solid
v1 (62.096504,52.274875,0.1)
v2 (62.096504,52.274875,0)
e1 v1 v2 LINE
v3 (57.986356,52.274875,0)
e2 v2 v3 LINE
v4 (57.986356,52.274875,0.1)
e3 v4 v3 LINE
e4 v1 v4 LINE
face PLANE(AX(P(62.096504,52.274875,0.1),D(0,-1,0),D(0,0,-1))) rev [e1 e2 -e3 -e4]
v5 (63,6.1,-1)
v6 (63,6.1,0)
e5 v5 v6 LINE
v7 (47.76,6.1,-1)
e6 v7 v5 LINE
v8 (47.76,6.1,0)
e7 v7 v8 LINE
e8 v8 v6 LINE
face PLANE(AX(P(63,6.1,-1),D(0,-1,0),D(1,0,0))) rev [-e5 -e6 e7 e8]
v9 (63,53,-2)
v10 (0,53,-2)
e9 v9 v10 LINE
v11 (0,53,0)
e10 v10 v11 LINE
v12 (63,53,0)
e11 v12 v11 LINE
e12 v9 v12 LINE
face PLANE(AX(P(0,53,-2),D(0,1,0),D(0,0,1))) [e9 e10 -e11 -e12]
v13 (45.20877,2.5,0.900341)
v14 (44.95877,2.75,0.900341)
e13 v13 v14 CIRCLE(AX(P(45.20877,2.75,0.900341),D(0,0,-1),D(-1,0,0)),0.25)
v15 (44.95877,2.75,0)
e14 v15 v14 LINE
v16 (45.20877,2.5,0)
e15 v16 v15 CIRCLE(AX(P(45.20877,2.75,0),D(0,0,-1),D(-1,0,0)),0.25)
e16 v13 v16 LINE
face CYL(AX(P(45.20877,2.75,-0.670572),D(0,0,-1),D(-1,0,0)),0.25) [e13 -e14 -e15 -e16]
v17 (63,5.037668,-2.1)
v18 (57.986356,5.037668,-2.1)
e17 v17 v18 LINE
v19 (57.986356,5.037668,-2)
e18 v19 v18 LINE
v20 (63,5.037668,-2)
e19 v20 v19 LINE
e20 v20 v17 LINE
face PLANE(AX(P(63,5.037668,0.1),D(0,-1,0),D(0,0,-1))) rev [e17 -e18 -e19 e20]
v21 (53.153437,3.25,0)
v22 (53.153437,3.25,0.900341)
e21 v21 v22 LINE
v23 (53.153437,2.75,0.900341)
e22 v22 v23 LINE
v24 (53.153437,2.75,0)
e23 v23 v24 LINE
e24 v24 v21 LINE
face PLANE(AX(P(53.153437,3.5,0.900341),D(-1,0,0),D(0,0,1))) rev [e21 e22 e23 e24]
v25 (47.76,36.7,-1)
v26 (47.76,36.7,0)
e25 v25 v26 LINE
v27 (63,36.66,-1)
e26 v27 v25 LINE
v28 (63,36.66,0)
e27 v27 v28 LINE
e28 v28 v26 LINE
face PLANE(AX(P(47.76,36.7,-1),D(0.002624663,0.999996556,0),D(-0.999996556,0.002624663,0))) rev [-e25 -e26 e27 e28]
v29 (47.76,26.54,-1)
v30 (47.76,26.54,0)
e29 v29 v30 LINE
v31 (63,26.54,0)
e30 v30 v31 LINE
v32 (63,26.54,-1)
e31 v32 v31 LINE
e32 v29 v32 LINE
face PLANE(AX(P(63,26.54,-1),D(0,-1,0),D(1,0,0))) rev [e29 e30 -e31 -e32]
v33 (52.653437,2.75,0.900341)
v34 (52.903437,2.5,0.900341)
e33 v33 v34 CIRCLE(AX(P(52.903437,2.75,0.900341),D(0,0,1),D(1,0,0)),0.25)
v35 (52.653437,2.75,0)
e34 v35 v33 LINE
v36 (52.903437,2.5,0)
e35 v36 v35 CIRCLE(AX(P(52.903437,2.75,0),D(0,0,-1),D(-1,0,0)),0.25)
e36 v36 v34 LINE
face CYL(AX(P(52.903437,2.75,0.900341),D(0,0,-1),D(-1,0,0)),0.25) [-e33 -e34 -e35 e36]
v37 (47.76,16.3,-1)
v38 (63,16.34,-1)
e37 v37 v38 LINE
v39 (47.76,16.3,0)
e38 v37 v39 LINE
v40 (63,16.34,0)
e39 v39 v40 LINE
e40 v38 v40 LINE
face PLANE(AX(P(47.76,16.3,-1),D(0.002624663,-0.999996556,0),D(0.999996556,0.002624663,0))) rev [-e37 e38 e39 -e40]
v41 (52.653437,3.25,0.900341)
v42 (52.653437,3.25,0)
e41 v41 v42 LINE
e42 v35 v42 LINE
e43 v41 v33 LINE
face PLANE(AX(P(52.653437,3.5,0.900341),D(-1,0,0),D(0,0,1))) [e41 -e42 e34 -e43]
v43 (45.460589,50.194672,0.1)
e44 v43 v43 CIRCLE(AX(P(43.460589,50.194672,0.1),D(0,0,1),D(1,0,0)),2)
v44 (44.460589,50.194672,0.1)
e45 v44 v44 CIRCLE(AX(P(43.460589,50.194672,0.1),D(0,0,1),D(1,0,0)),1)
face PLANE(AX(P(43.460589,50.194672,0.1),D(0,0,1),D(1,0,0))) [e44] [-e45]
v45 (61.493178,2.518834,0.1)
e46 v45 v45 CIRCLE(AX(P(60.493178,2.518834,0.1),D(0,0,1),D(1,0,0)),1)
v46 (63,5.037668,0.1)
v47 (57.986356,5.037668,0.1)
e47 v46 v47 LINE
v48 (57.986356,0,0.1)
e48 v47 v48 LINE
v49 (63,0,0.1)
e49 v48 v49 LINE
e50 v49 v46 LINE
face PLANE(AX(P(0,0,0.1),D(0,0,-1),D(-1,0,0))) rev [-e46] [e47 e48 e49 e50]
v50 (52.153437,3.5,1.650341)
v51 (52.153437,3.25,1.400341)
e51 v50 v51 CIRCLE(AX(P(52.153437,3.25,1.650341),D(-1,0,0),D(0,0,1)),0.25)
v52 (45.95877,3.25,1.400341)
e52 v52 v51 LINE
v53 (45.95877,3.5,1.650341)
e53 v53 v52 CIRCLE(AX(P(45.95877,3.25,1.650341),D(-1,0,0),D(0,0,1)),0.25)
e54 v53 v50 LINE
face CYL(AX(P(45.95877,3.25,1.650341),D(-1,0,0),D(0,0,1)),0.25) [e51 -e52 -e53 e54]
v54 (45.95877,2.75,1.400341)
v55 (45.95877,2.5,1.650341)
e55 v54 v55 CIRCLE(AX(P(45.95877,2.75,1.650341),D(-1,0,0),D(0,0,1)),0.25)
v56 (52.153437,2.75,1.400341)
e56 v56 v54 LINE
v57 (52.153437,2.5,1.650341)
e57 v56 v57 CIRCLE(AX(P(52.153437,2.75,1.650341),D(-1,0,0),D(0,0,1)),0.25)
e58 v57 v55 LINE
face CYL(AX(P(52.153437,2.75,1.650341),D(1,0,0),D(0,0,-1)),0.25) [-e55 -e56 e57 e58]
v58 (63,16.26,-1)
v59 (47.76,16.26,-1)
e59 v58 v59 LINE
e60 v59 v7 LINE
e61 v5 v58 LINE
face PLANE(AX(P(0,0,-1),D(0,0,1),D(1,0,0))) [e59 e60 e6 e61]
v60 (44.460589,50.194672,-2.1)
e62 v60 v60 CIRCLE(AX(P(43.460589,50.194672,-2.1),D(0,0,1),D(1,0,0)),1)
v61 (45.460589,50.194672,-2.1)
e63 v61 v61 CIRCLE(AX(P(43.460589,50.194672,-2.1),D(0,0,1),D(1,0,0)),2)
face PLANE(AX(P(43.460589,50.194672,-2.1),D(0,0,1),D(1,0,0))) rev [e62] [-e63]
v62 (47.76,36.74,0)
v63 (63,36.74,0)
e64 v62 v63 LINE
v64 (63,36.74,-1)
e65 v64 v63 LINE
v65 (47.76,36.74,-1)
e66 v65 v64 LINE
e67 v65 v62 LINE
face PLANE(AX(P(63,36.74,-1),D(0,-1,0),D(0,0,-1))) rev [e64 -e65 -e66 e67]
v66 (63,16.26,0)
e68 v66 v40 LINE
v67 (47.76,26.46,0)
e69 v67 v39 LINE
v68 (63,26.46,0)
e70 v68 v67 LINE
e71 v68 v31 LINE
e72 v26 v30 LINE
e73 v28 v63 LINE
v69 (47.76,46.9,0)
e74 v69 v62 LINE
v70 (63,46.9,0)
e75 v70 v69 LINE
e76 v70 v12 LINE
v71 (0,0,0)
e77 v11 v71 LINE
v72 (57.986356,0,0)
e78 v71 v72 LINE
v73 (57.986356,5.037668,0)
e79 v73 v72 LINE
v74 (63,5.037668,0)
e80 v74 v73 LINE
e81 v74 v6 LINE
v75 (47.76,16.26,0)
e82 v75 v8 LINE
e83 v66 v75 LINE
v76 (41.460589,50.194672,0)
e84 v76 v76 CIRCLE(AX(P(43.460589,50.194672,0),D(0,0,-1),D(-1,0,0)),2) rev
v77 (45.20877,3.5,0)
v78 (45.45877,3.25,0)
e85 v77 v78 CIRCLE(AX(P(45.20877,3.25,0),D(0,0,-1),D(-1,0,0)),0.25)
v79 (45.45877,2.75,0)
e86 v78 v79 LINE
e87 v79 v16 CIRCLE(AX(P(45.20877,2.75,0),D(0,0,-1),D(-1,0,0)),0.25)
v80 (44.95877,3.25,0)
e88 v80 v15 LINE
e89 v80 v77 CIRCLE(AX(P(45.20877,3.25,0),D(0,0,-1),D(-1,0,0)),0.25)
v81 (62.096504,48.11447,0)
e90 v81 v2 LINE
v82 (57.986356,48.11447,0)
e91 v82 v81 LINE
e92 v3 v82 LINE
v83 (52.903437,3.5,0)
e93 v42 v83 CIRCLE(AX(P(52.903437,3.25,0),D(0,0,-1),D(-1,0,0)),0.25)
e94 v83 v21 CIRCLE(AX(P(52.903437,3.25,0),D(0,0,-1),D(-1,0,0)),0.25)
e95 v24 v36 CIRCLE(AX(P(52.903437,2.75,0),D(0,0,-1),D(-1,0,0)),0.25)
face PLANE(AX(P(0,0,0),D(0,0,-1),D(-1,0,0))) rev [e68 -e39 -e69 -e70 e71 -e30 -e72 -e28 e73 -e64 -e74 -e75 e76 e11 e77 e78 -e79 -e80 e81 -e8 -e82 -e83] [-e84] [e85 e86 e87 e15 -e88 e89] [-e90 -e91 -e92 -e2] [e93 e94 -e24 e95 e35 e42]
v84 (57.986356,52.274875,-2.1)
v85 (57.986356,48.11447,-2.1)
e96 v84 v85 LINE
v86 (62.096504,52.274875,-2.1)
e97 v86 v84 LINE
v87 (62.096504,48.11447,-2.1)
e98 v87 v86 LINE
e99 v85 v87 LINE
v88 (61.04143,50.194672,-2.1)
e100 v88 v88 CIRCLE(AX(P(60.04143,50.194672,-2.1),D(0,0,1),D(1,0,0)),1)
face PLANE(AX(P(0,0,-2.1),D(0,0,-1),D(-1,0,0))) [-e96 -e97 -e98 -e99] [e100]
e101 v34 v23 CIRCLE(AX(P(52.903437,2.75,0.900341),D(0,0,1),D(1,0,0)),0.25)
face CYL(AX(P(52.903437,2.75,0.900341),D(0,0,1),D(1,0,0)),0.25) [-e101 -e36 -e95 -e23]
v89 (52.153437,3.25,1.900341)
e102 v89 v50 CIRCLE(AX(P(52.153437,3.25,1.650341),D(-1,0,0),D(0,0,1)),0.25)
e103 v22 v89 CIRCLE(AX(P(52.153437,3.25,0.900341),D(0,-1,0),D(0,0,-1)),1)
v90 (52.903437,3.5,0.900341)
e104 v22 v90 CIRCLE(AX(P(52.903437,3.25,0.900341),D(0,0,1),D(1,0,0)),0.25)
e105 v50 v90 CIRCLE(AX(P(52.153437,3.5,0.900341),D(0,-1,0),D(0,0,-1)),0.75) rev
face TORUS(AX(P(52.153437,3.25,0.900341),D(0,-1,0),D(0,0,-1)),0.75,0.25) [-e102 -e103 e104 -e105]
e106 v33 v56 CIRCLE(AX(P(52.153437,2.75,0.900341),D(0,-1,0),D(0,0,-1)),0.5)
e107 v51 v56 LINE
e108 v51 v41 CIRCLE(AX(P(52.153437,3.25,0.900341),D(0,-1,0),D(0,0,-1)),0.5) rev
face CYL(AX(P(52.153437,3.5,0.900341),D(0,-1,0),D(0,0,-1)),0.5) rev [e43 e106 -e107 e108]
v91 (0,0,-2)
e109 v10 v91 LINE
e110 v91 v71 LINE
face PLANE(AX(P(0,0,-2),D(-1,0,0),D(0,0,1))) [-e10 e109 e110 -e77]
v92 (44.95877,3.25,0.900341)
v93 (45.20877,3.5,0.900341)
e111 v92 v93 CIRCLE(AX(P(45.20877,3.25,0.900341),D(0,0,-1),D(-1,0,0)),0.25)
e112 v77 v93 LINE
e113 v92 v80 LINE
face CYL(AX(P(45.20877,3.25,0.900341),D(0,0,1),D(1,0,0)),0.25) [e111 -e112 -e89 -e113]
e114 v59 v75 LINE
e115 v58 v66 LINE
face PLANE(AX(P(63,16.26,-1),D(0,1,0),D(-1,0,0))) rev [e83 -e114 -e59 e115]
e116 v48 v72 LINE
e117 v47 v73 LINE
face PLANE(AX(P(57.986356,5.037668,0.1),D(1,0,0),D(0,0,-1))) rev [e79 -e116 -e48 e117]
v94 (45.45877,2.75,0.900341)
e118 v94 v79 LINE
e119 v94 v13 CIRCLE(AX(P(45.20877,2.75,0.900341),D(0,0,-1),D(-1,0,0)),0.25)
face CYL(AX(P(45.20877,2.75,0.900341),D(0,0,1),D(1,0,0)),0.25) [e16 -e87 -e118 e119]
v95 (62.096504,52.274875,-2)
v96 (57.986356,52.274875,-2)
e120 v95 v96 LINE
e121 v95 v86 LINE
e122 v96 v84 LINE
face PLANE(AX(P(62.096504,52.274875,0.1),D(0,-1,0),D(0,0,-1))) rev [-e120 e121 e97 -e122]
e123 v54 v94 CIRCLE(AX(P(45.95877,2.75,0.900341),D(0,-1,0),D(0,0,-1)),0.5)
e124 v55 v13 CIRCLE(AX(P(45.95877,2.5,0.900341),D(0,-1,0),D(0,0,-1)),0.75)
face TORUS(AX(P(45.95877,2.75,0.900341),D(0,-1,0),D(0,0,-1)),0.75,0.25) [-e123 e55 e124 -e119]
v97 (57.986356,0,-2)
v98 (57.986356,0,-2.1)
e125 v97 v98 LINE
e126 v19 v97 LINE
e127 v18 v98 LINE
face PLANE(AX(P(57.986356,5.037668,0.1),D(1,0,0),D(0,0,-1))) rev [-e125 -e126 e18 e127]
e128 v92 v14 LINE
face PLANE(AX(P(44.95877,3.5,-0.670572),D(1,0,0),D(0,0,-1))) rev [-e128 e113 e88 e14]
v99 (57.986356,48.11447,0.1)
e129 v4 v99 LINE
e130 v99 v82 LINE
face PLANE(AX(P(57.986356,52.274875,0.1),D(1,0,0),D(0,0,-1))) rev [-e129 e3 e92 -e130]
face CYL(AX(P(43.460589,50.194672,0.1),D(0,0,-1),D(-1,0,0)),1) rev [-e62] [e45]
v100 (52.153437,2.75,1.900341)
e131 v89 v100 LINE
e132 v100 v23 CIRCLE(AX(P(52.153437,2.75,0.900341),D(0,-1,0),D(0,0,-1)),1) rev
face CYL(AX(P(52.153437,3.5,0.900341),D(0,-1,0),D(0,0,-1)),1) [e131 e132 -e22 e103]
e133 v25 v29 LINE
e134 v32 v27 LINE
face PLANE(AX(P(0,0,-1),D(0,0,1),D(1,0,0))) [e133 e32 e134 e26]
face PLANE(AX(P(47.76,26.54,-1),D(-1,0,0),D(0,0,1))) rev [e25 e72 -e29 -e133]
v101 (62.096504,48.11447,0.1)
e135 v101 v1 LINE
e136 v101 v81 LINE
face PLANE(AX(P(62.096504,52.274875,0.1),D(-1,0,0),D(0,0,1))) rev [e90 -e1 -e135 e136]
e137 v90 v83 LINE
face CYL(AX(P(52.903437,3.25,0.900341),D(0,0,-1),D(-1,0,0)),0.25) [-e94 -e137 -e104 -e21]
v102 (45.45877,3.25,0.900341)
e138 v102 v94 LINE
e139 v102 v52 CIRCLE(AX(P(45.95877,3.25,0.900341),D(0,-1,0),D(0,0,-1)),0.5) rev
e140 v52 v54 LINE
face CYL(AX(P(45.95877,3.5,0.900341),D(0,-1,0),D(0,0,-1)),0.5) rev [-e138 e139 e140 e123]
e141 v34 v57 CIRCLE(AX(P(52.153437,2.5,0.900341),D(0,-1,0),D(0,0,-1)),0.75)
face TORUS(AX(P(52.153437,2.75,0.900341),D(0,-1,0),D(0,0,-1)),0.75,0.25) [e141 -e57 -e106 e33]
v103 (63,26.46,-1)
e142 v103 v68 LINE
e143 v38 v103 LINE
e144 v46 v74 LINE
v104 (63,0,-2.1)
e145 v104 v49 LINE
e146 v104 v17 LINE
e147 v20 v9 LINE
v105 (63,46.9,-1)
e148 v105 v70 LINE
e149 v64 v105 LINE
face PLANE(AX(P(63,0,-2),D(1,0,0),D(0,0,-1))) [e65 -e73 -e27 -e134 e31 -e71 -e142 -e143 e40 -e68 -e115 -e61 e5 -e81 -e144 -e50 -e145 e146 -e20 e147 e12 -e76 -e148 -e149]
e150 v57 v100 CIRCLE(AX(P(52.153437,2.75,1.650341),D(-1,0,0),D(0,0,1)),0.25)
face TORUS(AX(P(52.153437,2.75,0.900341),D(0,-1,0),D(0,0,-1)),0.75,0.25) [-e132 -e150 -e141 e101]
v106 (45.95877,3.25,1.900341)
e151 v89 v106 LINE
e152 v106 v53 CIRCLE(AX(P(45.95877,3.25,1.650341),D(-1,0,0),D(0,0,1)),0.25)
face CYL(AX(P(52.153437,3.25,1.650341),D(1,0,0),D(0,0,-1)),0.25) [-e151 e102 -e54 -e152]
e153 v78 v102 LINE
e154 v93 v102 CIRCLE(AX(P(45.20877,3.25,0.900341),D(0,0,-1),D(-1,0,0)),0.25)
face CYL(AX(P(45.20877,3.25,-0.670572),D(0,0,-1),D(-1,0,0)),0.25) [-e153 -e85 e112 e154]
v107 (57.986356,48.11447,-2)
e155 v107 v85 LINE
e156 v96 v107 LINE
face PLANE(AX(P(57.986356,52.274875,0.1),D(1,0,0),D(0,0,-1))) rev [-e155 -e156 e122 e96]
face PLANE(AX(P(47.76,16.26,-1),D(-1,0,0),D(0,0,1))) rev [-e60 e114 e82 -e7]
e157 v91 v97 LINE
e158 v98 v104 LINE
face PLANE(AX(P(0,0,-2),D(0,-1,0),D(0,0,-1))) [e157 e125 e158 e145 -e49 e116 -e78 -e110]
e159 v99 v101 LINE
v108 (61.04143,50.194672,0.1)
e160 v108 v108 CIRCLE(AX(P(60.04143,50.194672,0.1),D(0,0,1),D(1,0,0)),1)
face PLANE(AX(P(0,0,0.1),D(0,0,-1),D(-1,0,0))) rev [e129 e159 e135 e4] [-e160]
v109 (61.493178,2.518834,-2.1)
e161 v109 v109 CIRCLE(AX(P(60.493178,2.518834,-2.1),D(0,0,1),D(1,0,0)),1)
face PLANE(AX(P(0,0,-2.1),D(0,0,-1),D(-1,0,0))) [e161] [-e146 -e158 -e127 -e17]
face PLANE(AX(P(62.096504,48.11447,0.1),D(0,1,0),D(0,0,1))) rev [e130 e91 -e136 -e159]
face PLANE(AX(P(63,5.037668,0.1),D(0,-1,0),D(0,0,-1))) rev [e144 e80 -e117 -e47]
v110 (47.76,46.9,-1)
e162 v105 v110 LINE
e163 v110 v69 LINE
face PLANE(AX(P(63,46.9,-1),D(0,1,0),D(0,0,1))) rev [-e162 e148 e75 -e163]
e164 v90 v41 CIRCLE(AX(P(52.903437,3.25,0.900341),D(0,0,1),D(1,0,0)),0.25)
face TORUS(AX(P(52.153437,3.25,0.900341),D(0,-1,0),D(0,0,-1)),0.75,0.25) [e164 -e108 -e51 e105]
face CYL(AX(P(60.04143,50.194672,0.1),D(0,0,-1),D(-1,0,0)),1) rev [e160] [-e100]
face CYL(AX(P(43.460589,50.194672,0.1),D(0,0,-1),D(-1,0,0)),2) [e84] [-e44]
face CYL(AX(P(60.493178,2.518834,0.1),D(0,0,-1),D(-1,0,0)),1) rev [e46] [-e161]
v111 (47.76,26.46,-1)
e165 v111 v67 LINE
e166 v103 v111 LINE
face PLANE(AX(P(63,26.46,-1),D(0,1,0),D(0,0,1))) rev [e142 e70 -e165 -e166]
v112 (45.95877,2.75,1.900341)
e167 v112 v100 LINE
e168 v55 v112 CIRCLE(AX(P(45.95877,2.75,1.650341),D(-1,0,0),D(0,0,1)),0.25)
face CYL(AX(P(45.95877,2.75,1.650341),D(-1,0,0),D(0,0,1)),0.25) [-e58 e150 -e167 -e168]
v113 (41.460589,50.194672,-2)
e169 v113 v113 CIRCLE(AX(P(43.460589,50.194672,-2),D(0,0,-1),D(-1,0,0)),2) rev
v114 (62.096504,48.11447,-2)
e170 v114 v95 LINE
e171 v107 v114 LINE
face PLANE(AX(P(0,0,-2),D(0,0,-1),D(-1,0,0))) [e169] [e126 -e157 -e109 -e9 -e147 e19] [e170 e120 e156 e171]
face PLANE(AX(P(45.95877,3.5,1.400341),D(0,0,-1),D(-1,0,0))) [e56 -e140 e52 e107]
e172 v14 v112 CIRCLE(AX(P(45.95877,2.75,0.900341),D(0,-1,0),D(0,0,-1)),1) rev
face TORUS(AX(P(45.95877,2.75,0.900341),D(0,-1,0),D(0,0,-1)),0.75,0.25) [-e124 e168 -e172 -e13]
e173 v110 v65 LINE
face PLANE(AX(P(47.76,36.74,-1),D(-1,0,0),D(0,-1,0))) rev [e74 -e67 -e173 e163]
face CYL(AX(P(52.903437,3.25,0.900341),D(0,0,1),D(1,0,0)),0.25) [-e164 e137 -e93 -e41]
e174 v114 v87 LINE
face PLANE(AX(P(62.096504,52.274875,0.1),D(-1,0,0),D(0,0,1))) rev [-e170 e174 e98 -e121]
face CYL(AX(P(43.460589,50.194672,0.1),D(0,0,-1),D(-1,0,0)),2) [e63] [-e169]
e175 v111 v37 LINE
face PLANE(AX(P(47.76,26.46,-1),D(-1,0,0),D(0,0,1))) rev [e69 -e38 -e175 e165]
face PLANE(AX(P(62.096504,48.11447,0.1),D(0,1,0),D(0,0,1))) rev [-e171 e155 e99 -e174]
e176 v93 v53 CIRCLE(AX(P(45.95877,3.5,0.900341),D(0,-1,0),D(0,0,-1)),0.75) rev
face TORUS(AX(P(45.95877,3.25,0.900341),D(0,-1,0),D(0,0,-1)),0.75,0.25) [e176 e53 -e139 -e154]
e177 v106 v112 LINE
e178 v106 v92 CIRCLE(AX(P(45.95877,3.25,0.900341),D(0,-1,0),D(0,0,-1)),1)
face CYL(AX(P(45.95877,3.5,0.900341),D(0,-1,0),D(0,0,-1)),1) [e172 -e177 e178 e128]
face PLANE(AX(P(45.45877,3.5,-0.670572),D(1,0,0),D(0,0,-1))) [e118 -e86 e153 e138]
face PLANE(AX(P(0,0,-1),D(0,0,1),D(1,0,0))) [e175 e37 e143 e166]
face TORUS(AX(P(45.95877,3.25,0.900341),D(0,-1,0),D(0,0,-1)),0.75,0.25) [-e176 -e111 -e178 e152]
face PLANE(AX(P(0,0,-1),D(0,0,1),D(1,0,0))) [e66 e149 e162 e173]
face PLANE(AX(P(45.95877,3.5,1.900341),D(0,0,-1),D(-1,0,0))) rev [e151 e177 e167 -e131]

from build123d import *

# Parameters (mm, degrees)
SKETCH1_W                = 63
SKETCH1_H                = 53
BOSS_EXTRUDE1_DEPTH      = 2
SKETCH2_W                = 15.24
SKETCH2_H                = 10.16
CUT_EXTRUDE1_DEPTH       = 1
BOSS_EXTRUDE2_DEPTH      = 0.1
BOSS_EXTRUDE2_DEPTH_BACK = 2.1
SKETCH4_R                = 2
SKETCH4_R_2              = 1
SKETCH4_W                = 5.013644296
SKETCH4_H                = 5.037668264
SKETCH4_W_2              = 4.110148076
SKETCH4_H_2              = 4.160405132
CUT_EXTRUDE2_START       = -2
SKETCH5_R                = 1
CUT_EXTRUDE2_DEPTH       = 2
EXTRUDE_THIN1_DEPTH      = 0.5
EXTRUDE_THIN1_DEPTH_BACK = 0.5
FILLET1_R                = 0.25


with BuildPart() as part:
    # Sketch1 → Boss-Extrude1 (new body)
    with BuildSketch(Plane.XY):
        with Locations((31.5, 26.5)):
            Rectangle(SKETCH1_W, SKETCH1_H)
    extrude(amount=-BOSS_EXTRUDE1_DEPTH)

    # Sketch2 → Cut-Extrude1 (cut)
    with BuildSketch(Plane.XY):
        Polygon((63, 26.54), (47.76, 26.54), (47.76, 36.7), (63, 36.66), align=None)
        with Locations((55.38, 41.82)):
            Rectangle(SKETCH2_W, SKETCH2_H)
        with Locations((55.38, 11.18)):
            Rectangle(SKETCH2_W, SKETCH2_H)
        Polygon((47.76, 16.3), (63, 16.34), (63, 26.46), (47.76, 26.46), align=None)
    extrude(amount=-CUT_EXTRUDE1_DEPTH, mode=Mode.SUBTRACT)

    # Sketch4 → Boss-Extrude2 (add, two sides: drawn at the far end of the back side and taken through both)
    # profile 1 of 3: a face of its own
    with BuildSketch(Plane.XY.offset(-BOSS_EXTRUDE2_DEPTH_BACK)):
        with Locations(Location((43.460589495, 50.19467241, 0), (0, 0, 180))):
            Circle(SKETCH4_R)
        with Locations(Location((43.460589495, 50.19467241, 0), (0, 0, 180))):
            Circle(SKETCH4_R_2, mode=Mode.SUBTRACT)
    # profile 2 of 3: a face of its own
    with BuildSketch(Plane.XY.offset(-BOSS_EXTRUDE2_DEPTH_BACK)):
        with Locations((60.493177852, 2.518834132)):
            Rectangle(SKETCH4_W, SKETCH4_H)
        with Locations(Location((60.493177852, 2.518834132, 0), (0, 0, 180))):
            Circle(SKETCH4_R_2, mode=Mode.SUBTRACT)
    # profile 3 of 3: a face of its own
    with BuildSketch(Plane.XY.offset(-BOSS_EXTRUDE2_DEPTH_BACK)):
        with Locations((60.041429742, 50.19467241)):
            Rectangle(SKETCH4_W_2, SKETCH4_H_2)
        with Locations(Location((60.041429742, 50.19467241, 0), (0, 0, 180))):
            Circle(SKETCH4_R_2, mode=Mode.SUBTRACT)
    extrude(amount=BOSS_EXTRUDE2_DEPTH + BOSS_EXTRUDE2_DEPTH_BACK)

    # Sketch5 → Cut-Extrude2 (cut)
    with BuildSketch(Plane.XY.offset(CUT_EXTRUDE2_START)):
        with Locations((60.493177852, 2.518834132)):
            Circle(SKETCH5_R)
        with Locations((60.041429742, 50.19467241)):
            Circle(SKETCH5_R)
        with Locations((43.460589495, 50.19467241)):
            Circle(SKETCH5_R)
    extrude(amount=CUT_EXTRUDE2_DEPTH, mode=Mode.SUBTRACT)

    # Sketch6 → Extrude-Thin1 (add, two sides: drawn at the far end of the back side and taken through both)
    with BuildSketch(Plane(origin=(0, 3, 0), x_dir=(-1, 0, 0), z_dir=(0, -1, 0)).offset(-EXTRUDE_THIN1_DEPTH_BACK)):
        with BuildLine():
            Line((-45.458769881, 0.670572303), (-45.458769881, -0.900340835))
            ThreePointArc((-45.458769881, -0.900340835), (-45.605216491, -1.253894226), (-45.958769881, -1.400340835))
            Line((-45.958769881, -1.400340835), (-52.153437165, -1.400340835))
            ThreePointArc((-52.153437165, -1.400340835), (-52.506990556, -1.253894226), (-52.653437165, -0.900340835))
            Line((-52.653437165, -0.900340835), (-52.653437165, 0.670572303))
            Line((-52.653437165, 0.670572303), (-53.153437165, 0.670572303))
            Line((-53.153437165, 0.670572303), (-53.153437165, -0.900340835))
            ThreePointArc((-53.153437165, -0.900340835), (-52.860543946, -1.607447616), (-52.153437165, -1.900340835))
            Line((-52.153437165, -1.900340835), (-45.958769881, -1.900340835))
            ThreePointArc((-45.958769881, -1.900340835), (-45.2516631, -1.607447616), (-44.958769881, -0.900340835))
            Line((-44.958769881, -0.900340835), (-44.958769881, 0.670572303))
            Line((-44.958769881, 0.670572303), (-45.458769881, 0.670572303))
        make_face()
    extrude(amount=EXTRUDE_THIN1_DEPTH + EXTRUDE_THIN1_DEPTH_BACK)

    # Fillet1
    fillet1_edges = [part.edges().sort_by_distance(p)[0] for p in [
        (45.458769881, 3.5, 0.450170417),
        (45.605216491, 3.5, 1.253894226),
        (52.653437165, 3.5, 0.450170417),
        (52.506990556, 3.5, 1.253894226),
        (45.458769881, 2.5, 0.450170417),
        (45.605216491, 2.5, 1.253894226),
        (52.653437165, 2.5, 0.450170417),
        (52.506990556, 2.5, 1.253894226),
        (44.958769881, 3.5, 0.450170417),
        (45.2516631, 3.5, 1.607447616),
        (53.153437165, 3.5, 0.450170417),
        (52.860543946, 3.5, 1.607447616),
        (44.958769881, 2.5, 0.450170417),
        (53.153437165, 2.5, 0.450170417),
        (52.860543946, 2.5, 1.607447616),
        (49.056103523, 2.5, 1.900340835),
        (49.056103523, 3.5, 1.400340835),
        (49.056103523, 2.5, 1.400340835),
        (49.056103523, 3.5, 1.900340835),
        (45.2516631, 2.5, 1.607447616),
    ]]
    fillet(fillet1_edges, radius=FILLET1_R - 0.0001)  # a hair under: the kernel refuses the full size


solid = part.part
